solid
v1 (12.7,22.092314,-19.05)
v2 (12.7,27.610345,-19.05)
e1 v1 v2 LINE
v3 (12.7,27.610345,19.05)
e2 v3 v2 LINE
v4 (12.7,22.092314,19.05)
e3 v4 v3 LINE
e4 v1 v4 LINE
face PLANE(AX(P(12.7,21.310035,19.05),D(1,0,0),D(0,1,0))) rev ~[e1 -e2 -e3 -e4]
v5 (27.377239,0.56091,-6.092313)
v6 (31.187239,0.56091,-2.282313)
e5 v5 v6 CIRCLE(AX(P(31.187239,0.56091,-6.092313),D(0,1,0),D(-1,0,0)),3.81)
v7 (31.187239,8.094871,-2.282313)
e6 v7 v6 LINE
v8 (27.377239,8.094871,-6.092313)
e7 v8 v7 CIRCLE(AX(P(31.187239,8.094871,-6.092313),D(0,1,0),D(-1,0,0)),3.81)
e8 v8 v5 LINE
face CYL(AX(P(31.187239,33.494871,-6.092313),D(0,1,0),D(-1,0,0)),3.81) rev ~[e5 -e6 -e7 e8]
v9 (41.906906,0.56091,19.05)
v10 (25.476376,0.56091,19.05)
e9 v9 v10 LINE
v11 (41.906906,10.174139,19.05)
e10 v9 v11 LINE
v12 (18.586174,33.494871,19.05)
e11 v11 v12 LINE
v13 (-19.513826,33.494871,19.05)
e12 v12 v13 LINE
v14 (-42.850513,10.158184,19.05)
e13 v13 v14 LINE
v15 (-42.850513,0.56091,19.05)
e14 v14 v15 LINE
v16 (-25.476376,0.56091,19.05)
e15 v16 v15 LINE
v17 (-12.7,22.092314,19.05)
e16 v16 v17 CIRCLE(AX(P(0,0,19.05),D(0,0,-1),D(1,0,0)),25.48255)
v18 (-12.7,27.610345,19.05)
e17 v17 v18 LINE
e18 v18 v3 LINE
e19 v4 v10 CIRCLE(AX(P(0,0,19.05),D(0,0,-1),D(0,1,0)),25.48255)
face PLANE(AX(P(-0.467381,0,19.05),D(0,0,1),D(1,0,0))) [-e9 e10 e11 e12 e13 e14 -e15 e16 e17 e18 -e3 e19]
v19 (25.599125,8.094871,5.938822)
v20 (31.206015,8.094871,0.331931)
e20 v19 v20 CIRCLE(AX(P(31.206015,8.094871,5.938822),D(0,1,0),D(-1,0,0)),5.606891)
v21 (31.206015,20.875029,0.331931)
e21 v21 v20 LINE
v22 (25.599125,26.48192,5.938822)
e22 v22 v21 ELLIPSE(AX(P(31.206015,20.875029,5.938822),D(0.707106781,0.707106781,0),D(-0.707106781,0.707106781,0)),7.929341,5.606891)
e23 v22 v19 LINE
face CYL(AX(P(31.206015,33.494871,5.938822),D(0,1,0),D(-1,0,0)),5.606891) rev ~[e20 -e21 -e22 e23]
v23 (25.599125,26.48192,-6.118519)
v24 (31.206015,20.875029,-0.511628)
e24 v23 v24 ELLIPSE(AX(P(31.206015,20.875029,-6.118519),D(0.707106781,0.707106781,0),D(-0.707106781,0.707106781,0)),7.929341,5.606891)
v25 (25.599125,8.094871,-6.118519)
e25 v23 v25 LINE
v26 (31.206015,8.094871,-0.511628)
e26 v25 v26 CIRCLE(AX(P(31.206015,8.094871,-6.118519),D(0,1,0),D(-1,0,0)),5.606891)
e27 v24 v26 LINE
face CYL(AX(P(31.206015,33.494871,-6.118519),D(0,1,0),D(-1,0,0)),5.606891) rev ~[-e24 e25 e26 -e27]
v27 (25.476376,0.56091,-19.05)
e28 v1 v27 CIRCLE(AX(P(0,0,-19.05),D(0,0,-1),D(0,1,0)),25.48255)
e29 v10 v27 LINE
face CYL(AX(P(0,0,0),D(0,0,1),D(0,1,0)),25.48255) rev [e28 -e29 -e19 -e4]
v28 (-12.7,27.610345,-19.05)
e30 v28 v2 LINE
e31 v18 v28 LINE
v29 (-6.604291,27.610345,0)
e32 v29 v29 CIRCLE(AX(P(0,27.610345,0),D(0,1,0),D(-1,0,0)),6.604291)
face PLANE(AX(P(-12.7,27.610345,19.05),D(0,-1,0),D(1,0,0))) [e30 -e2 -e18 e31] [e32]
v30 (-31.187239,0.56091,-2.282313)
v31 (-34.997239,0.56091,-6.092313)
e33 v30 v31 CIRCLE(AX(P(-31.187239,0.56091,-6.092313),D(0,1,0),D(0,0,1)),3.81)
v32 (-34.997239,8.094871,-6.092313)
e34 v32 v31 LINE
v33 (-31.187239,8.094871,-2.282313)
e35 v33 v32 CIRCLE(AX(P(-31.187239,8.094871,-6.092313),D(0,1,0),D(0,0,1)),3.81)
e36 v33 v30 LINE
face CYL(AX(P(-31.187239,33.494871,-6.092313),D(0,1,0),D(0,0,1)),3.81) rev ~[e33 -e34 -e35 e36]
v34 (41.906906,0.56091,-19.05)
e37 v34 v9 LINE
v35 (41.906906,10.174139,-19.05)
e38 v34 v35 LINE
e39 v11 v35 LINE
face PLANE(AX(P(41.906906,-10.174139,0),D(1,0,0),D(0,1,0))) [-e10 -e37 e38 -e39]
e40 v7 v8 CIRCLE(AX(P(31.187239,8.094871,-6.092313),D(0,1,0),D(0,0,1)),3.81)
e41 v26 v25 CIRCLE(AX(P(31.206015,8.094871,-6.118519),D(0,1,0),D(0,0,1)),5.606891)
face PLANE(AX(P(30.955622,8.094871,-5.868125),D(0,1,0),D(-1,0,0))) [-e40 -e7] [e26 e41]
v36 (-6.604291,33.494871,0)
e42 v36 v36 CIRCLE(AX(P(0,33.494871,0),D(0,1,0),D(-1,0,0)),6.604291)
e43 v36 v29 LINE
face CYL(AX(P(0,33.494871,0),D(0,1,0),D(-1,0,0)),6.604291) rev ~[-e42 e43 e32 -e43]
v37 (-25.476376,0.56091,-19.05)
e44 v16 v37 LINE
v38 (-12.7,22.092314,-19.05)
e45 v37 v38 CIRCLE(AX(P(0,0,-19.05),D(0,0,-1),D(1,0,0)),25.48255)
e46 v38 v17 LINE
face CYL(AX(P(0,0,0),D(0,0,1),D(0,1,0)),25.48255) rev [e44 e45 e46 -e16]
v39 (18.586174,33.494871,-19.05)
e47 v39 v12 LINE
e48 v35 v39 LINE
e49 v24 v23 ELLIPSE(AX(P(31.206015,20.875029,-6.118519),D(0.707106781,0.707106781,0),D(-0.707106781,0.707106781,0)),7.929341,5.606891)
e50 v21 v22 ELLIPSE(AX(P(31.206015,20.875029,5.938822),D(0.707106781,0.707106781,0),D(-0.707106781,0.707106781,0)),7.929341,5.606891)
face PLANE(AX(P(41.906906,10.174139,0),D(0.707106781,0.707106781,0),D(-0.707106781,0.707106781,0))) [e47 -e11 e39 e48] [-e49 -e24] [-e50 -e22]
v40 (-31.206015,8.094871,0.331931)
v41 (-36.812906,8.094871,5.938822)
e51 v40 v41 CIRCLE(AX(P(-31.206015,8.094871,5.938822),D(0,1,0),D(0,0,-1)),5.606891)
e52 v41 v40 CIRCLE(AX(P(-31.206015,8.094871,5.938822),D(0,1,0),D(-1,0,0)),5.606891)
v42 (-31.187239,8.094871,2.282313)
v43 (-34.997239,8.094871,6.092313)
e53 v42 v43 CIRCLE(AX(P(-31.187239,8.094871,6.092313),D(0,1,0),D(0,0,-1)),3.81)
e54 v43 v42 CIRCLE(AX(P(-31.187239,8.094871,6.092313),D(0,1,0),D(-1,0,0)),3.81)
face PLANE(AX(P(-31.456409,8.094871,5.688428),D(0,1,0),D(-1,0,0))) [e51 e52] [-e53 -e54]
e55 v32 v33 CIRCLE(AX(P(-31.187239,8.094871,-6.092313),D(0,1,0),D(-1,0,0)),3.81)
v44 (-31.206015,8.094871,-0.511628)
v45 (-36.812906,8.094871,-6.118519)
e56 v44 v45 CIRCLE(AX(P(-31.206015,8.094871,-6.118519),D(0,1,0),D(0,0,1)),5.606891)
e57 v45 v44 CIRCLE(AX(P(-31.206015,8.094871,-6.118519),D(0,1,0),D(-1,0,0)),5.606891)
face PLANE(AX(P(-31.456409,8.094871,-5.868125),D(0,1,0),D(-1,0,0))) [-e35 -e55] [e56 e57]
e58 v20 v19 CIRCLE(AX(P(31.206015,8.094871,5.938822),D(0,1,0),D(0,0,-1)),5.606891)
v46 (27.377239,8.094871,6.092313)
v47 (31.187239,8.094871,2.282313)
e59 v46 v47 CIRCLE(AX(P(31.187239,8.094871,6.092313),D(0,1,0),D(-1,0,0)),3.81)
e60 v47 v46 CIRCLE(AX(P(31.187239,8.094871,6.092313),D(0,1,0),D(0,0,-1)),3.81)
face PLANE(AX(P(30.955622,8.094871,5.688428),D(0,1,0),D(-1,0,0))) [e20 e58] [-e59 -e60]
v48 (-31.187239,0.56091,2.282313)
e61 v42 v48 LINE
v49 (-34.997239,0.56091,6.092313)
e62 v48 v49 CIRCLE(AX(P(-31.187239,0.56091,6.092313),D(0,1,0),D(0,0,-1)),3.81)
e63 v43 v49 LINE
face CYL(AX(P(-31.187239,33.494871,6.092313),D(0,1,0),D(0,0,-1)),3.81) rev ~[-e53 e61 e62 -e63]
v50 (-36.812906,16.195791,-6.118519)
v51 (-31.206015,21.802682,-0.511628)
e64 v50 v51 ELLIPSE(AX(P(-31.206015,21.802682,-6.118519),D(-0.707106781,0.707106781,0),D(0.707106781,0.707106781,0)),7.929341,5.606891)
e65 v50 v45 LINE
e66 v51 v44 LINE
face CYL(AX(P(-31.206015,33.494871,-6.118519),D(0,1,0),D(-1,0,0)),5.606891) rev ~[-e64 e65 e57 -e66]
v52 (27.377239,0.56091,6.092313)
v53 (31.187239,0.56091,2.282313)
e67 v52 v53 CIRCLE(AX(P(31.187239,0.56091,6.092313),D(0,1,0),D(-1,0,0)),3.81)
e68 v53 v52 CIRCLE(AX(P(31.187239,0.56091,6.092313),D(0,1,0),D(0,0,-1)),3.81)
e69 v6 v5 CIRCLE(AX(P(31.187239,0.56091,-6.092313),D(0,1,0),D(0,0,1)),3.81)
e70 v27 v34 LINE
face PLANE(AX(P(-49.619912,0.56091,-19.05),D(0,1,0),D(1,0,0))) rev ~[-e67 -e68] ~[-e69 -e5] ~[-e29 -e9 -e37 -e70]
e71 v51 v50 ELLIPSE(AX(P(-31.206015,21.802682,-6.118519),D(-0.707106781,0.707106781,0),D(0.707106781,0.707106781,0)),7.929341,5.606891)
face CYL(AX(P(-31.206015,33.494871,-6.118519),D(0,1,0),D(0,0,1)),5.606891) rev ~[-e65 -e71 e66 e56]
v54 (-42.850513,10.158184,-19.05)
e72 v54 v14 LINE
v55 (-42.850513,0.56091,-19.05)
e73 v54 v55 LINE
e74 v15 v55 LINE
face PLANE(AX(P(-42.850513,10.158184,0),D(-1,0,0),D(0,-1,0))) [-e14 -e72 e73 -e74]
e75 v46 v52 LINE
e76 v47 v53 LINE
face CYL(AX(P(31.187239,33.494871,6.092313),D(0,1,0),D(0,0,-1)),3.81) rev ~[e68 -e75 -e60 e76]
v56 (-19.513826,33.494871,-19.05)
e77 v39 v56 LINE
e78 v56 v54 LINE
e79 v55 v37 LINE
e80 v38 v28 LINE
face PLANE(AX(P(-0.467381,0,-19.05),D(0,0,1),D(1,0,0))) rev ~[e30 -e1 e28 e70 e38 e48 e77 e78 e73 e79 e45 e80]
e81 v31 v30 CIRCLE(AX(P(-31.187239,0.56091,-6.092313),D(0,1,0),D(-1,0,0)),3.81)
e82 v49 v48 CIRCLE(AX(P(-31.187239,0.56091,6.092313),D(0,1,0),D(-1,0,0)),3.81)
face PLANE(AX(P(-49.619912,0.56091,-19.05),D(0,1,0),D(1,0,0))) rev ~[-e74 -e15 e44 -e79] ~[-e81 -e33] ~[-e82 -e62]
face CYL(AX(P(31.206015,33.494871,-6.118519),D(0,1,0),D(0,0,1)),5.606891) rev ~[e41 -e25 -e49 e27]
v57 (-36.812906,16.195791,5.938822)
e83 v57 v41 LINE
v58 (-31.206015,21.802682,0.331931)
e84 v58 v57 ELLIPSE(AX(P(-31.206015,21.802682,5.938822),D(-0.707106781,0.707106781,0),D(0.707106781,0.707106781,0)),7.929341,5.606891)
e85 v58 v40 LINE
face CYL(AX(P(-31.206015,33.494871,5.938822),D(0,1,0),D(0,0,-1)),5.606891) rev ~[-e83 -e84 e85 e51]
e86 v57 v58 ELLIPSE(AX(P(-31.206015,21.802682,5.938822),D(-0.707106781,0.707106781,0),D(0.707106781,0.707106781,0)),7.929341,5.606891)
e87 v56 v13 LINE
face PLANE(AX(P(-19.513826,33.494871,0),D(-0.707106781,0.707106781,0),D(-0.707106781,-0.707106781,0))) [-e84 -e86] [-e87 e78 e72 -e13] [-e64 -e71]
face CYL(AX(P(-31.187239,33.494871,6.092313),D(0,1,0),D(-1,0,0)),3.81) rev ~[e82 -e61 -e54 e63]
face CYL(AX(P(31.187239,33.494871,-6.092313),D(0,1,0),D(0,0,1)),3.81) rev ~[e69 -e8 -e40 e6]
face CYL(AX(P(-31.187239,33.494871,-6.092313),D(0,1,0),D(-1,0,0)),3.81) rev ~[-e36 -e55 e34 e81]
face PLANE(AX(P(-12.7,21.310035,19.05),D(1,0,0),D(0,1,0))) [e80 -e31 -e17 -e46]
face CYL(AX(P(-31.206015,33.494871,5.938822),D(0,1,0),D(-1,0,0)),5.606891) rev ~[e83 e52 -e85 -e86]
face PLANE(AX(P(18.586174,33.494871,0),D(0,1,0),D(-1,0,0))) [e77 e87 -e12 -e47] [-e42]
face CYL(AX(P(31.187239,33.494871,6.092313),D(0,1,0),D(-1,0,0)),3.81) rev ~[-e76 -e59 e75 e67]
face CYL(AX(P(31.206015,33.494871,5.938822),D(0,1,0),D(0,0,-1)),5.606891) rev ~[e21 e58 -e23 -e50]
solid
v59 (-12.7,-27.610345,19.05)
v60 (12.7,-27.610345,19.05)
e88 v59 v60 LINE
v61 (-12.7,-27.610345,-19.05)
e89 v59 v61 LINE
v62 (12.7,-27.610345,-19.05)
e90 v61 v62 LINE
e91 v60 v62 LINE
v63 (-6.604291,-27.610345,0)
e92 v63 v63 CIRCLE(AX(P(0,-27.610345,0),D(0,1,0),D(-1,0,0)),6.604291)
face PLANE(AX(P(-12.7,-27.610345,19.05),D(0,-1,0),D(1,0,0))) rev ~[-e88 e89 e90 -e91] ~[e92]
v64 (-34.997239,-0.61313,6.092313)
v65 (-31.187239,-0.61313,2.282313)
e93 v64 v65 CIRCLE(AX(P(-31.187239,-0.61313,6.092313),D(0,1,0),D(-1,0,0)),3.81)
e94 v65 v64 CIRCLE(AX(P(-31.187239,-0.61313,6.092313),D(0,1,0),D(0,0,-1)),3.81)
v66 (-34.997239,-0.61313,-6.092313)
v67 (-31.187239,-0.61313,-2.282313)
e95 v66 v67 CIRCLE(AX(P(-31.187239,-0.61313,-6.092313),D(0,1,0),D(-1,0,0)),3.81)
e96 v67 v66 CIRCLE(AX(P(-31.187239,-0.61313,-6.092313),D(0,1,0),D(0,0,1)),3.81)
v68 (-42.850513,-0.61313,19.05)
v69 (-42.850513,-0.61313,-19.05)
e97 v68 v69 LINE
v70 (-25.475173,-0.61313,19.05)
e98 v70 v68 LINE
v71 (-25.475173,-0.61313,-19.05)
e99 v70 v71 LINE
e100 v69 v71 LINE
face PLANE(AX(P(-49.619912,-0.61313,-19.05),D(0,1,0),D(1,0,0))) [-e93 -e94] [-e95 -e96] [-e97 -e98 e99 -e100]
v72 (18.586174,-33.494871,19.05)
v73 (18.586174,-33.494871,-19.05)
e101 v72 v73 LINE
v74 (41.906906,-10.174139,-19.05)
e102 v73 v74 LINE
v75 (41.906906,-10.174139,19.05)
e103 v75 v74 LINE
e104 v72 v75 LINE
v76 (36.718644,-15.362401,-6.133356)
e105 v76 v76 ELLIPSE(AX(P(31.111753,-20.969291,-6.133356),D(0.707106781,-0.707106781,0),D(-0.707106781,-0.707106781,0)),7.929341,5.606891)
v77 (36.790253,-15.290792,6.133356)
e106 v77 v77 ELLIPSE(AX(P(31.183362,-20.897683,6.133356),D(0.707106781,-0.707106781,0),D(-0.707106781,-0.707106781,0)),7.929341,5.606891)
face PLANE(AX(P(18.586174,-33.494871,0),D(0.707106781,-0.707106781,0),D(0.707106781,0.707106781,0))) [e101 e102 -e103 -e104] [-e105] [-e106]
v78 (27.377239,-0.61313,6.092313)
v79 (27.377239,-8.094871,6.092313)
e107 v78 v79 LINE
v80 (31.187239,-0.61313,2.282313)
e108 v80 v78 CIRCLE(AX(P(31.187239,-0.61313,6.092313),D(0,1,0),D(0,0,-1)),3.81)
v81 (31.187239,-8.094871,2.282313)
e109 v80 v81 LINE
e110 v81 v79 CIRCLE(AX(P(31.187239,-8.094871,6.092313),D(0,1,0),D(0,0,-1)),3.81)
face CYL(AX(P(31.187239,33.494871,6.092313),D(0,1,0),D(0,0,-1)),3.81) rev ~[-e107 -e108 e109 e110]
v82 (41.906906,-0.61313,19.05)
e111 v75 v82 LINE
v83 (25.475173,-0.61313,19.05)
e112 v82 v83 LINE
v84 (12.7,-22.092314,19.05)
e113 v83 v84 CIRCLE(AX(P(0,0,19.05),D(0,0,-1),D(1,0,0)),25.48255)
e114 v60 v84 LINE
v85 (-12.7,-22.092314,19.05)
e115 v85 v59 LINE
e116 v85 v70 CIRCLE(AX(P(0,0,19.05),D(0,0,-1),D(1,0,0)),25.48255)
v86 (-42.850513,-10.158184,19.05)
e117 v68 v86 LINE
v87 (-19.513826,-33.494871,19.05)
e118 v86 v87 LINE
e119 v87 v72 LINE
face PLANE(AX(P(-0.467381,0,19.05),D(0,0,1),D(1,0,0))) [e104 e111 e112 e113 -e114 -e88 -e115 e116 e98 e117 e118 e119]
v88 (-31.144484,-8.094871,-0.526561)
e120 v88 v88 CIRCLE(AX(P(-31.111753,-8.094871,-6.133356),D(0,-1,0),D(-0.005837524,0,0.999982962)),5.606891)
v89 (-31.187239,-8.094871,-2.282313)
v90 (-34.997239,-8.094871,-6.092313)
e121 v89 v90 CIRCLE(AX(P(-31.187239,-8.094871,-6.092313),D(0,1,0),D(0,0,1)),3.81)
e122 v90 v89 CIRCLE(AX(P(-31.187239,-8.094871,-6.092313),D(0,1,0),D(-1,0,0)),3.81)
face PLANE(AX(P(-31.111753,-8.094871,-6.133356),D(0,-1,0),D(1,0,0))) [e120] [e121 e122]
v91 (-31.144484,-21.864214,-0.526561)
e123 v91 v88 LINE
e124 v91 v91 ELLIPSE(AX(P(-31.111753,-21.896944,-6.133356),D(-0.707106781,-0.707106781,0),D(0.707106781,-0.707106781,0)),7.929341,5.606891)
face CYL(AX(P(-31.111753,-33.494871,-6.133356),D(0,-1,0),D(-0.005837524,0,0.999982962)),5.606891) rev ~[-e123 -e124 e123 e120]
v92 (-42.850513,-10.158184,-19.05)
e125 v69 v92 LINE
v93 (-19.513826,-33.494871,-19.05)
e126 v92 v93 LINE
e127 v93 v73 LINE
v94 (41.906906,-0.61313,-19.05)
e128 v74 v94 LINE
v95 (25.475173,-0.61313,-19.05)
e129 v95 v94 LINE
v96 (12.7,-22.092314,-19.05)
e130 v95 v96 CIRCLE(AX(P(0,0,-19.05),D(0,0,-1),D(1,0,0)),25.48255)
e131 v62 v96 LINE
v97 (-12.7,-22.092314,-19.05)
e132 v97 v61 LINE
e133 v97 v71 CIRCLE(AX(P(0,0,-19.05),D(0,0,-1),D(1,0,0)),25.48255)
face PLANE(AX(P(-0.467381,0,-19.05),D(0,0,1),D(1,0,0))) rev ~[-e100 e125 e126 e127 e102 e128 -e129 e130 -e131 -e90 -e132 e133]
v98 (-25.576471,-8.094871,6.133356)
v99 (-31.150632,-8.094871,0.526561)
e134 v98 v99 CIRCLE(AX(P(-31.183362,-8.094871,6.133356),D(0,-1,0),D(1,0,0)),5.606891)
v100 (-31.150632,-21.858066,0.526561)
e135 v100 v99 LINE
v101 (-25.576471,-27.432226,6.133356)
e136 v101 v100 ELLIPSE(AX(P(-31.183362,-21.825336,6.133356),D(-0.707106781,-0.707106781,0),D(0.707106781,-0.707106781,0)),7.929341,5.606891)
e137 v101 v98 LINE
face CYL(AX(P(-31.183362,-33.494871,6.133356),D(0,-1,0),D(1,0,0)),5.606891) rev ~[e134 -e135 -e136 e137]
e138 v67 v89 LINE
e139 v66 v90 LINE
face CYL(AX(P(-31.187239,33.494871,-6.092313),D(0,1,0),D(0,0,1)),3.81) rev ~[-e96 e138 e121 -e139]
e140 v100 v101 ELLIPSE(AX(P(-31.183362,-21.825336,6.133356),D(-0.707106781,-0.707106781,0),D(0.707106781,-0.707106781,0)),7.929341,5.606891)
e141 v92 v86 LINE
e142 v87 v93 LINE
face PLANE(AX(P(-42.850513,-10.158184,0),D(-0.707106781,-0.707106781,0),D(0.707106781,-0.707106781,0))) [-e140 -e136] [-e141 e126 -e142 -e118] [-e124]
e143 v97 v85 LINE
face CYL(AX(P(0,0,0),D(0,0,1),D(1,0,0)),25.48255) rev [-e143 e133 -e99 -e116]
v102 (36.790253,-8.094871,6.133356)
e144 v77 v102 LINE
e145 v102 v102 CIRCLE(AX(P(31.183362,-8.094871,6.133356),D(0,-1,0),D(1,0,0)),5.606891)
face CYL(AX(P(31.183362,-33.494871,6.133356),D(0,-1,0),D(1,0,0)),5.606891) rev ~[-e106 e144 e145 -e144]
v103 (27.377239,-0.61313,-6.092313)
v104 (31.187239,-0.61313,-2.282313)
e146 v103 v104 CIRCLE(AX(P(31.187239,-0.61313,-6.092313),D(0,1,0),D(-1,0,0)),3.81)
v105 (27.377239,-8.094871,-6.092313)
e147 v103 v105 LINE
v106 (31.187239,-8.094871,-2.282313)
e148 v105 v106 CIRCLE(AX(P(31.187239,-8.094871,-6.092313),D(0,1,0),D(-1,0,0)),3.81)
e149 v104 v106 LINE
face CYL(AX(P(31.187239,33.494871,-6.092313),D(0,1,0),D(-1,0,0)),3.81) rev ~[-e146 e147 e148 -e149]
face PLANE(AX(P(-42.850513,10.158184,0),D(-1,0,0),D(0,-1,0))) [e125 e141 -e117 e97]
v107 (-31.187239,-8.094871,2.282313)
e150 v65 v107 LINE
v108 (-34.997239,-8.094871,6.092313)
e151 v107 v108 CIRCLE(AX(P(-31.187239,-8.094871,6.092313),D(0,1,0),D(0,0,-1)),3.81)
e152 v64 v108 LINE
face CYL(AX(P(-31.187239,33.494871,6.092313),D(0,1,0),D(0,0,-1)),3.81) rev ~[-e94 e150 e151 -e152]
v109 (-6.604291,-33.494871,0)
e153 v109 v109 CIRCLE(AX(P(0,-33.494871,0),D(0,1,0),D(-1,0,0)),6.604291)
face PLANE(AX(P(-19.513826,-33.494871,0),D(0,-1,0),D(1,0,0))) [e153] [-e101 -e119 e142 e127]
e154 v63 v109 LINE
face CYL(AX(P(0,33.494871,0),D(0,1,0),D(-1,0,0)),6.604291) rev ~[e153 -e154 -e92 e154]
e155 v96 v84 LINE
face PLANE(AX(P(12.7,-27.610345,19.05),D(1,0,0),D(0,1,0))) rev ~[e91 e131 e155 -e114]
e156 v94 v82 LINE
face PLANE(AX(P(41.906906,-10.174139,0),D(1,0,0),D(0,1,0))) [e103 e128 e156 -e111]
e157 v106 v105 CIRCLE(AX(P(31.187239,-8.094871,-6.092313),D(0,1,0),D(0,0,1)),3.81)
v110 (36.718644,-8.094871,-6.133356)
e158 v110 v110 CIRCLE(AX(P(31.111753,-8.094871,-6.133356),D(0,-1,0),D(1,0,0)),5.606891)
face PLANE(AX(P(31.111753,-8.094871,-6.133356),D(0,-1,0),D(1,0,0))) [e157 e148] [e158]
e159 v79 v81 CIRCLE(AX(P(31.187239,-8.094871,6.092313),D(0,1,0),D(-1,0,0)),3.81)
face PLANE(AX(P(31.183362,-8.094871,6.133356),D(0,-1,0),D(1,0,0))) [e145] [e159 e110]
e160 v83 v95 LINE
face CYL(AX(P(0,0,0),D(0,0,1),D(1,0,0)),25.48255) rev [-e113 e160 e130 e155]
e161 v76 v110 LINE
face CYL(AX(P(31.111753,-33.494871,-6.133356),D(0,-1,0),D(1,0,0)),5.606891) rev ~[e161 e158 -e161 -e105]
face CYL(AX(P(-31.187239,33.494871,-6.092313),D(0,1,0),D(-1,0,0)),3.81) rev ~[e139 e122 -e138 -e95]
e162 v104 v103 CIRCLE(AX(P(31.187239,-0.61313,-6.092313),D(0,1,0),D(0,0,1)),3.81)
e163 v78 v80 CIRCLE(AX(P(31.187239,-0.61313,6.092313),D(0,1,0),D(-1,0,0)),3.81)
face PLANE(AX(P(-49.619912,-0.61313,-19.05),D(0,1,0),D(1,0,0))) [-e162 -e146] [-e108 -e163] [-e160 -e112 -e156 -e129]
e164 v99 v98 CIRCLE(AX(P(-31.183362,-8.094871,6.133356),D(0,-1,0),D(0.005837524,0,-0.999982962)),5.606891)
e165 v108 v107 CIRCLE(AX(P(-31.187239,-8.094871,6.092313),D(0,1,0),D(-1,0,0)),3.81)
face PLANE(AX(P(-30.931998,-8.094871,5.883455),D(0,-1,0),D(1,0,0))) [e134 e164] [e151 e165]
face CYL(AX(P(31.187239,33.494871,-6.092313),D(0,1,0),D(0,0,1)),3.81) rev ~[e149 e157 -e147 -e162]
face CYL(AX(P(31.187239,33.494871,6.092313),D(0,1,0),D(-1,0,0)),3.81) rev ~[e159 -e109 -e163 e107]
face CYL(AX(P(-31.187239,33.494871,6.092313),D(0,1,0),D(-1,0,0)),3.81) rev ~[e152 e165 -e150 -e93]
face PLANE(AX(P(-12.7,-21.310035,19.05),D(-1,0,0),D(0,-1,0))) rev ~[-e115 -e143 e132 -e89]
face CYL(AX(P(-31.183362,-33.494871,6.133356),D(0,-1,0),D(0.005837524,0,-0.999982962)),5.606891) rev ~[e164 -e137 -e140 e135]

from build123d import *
from build123d import SkipClean  # not in build123d's __all__

# Parameters (mm, degrees)
F1_DEPTH  = 19.05
F3_DEPTH  = 66.9907422194
F4_R      = 5.60689081
F5_DEPTH  = 25.4
F7_DEPTH  = 25.4
F8_W      = 110.2635304305
F8_H      = 1.1740395275
F9_DEPTH  = 38.1010001
F10_W     = 25.4
F10_H     = 6.3003107457
F11_DEPTH = 38.1010001


with BuildPart() as f1:
    # F0 (on Top) → F1 (new body, symmetric)
    with BuildSketch(Plane.XY):
        Polygon((41.9069059193, 10.174138844), (18.5861736536, 33.4948711097), (0, 33.4948711097), (-19.5138263464, 33.4948711097), (-42.8505130112, 10.1581844449), (-42.8505130112, 0), (-42.8505130112, -10.1581844449), (-19.5138263464, -33.4948711097), (18.5861736536, -33.4948711097), (41.9069059193, -10.174138844), align=None)
        with BuildLine():
            ThreePointArc((25.48255, 0), (-18.0188839069, -18.0188839069), (0, 25.48255))
            ThreePointArc((0, 25.48255), (18.0188839069, 18.0188839069), (25.48255, 0))
        make_face(mode=Mode.SUBTRACT)
    extrude(amount=F1_DEPTH, both=True)

    # F2 (on face) → F3 (cut, through all)
    with BuildSketch(Plane(origin=(0, 33.4948711097, 0), x_dir=(-1, 0, 0), z_dir=(0, 1, 0))):
        with BuildLine():
            ThreePointArc((31.1872387667, 2.2823126413), (33.8813156031, 3.398235805), (34.9972387667, 6.0923126413))
            ThreePointArc((34.9972387667, 6.0923126413), (28.4931619304, 8.7863894776), (31.1872387667, 2.2823126413))
        make_face()
        with BuildLine():
            ThreePointArc((34.9972387667, -6.0923126413), (33.8813156031, -3.398235805), (31.1872387667, -2.2823126413))
            ThreePointArc((31.1872387667, -2.2823126413), (28.4931619304, -8.7863894776), (34.9972387667, -6.0923126413))
        make_face()
        with BuildLine():
            ThreePointArc((-27.3772387667, -6.0923126413), (-28.4931619304, -3.398235805), (-31.1872387667, -2.2823126413))
            ThreePointArc((-31.1872387667, -2.2823126413), (-33.8813156031, -8.7863894776), (-27.3772387667, -6.0923126413))
        make_face()
        with BuildLine():
            ThreePointArc((-27.3772387667, 6.0923126413), (-33.8813156031, 8.7863894776), (-31.1872387667, 2.2823126413))
            ThreePointArc((-31.1872387667, 2.2823126413), (-28.4931619304, 3.398235805), (-27.3772387667, 6.0923126413))
        make_face()
        with BuildLine():
            ThreePointArc((-6.6042914247, 0), (0, -6.6042914247), (6.6042914247, 0))
            Line((6.6042914247, 0), (-6.6042914247, 0))
        make_face()
        with BuildLine():
            Line((-6.6042914247, 0), (6.6042914247, 0))
            ThreePointArc((6.6042914247, 0), (0, 6.6042914247), (-6.6042914247, 0))
        make_face()
    extrude(amount=-F3_DEPTH, mode=Mode.SUBTRACT)

    # F4 (on face) → F5 (cut)
    with BuildSketch(Plane.XZ.offset(33.4948711097)):
        with BuildLine():
            ThreePointArc((-31.1506315094, 0.5265610691), (-27.2071362658, 2.1802747004), (-25.5764710601, 6.1333563462))
            ThreePointArc((-25.5764710601, 6.1333563462), (-35.1595874746, 10.086437992), (-31.1506315094, 0.5265610691))
        make_face()
        with BuildLine():
            ThreePointArc((-25.5048626079, -6.1333563462), (-27.1586717722, -2.1571307417), (-31.1444837787, -0.5265610691))
            ThreePointArc((-31.1444837787, -0.5265610691), (-35.0648350638, -10.1095819506), (-25.5048626079, -6.1333563462))
        make_face()
        with Locations((31.111753418, -6.1333563462)):
            Circle(F4_R)
        with Locations((31.1833618702, 6.1333563462)):
            Circle(F4_R)
    extrude(amount=-F5_DEPTH, mode=Mode.SUBTRACT)

    # F6 (on face) → F7 (cut)
    with BuildSketch(Plane(origin=(0, 33.4948711097, 0), x_dir=(-1, 0, 0), z_dir=(0, 1, 0))):
        with BuildLine():
            ThreePointArc((-31.2060154974, 0.3319311278), (-27.2413449843, 1.9741514247), (-25.5991246874, 5.9388219379))
            ThreePointArc((-25.5991246874, 5.9388219379), (-35.1706860106, 9.903492451), (-31.2060154974, 0.3319311278))
        make_face()
        with BuildLine():
            ThreePointArc((36.8129063075, 5.9388219379), (27.2413449843, 9.903492451), (31.2060154974, 0.3319311278))
            ThreePointArc((31.2060154974, 0.3319311278), (35.1706860106, 1.9741514247), (36.8129063075, 5.9388219379))
        make_face()
        with BuildLine():
            ThreePointArc((36.8129063075, -6.118518766), (35.1706860106, -2.1538482529), (31.2060154974, -0.511627956))
            ThreePointArc((31.2060154974, -0.511627956), (27.2413449843, -10.0831892792), (36.8129063075, -6.118518766))
        make_face()
        with BuildLine():
            ThreePointArc((-25.5991246874, -6.118518766), (-27.2413449843, -2.1538482529), (-31.2060154974, -0.511627956))
            ThreePointArc((-31.2060154974, -0.511627956), (-35.1706860106, -10.0831892792), (-25.5991246874, -6.118518766))
        make_face()
    extrude(amount=-F7_DEPTH, mode=Mode.SUBTRACT)

    # F8 (on face) → F9 (cut, through all)
    with BuildSketch(Plane(origin=(0, 0, -19.05), x_dir=(1, 0, 0), z_dir=(0, 0, -1))):
        with Locations((5.5118532782, 0.0261101668)):
            Rectangle(F8_W, F8_H)
    extrude(amount=-F9_DEPTH, mode=Mode.SUBTRACT)

    # F10 (on face) → F11 (cut, through all)
    with BuildSketch(Plane.XY.offset(19.05)):
        Polygon((0, -21.3100345684), (-12.7, -21.3100345684), (-12.7, -27.6103453141), (12.7, -27.6103453141), (12.7, -21.3100345684), align=None)
        with Locations((0, 24.4601899413)):
            Rectangle(F10_W, F10_H)
    with SkipClean():  # cleaning this boolean's faces spoils the solid; the shape is the same uncleaned
        extrude(amount=-F11_DEPTH, mode=Mode.SUBTRACT)


solid = f1.part
